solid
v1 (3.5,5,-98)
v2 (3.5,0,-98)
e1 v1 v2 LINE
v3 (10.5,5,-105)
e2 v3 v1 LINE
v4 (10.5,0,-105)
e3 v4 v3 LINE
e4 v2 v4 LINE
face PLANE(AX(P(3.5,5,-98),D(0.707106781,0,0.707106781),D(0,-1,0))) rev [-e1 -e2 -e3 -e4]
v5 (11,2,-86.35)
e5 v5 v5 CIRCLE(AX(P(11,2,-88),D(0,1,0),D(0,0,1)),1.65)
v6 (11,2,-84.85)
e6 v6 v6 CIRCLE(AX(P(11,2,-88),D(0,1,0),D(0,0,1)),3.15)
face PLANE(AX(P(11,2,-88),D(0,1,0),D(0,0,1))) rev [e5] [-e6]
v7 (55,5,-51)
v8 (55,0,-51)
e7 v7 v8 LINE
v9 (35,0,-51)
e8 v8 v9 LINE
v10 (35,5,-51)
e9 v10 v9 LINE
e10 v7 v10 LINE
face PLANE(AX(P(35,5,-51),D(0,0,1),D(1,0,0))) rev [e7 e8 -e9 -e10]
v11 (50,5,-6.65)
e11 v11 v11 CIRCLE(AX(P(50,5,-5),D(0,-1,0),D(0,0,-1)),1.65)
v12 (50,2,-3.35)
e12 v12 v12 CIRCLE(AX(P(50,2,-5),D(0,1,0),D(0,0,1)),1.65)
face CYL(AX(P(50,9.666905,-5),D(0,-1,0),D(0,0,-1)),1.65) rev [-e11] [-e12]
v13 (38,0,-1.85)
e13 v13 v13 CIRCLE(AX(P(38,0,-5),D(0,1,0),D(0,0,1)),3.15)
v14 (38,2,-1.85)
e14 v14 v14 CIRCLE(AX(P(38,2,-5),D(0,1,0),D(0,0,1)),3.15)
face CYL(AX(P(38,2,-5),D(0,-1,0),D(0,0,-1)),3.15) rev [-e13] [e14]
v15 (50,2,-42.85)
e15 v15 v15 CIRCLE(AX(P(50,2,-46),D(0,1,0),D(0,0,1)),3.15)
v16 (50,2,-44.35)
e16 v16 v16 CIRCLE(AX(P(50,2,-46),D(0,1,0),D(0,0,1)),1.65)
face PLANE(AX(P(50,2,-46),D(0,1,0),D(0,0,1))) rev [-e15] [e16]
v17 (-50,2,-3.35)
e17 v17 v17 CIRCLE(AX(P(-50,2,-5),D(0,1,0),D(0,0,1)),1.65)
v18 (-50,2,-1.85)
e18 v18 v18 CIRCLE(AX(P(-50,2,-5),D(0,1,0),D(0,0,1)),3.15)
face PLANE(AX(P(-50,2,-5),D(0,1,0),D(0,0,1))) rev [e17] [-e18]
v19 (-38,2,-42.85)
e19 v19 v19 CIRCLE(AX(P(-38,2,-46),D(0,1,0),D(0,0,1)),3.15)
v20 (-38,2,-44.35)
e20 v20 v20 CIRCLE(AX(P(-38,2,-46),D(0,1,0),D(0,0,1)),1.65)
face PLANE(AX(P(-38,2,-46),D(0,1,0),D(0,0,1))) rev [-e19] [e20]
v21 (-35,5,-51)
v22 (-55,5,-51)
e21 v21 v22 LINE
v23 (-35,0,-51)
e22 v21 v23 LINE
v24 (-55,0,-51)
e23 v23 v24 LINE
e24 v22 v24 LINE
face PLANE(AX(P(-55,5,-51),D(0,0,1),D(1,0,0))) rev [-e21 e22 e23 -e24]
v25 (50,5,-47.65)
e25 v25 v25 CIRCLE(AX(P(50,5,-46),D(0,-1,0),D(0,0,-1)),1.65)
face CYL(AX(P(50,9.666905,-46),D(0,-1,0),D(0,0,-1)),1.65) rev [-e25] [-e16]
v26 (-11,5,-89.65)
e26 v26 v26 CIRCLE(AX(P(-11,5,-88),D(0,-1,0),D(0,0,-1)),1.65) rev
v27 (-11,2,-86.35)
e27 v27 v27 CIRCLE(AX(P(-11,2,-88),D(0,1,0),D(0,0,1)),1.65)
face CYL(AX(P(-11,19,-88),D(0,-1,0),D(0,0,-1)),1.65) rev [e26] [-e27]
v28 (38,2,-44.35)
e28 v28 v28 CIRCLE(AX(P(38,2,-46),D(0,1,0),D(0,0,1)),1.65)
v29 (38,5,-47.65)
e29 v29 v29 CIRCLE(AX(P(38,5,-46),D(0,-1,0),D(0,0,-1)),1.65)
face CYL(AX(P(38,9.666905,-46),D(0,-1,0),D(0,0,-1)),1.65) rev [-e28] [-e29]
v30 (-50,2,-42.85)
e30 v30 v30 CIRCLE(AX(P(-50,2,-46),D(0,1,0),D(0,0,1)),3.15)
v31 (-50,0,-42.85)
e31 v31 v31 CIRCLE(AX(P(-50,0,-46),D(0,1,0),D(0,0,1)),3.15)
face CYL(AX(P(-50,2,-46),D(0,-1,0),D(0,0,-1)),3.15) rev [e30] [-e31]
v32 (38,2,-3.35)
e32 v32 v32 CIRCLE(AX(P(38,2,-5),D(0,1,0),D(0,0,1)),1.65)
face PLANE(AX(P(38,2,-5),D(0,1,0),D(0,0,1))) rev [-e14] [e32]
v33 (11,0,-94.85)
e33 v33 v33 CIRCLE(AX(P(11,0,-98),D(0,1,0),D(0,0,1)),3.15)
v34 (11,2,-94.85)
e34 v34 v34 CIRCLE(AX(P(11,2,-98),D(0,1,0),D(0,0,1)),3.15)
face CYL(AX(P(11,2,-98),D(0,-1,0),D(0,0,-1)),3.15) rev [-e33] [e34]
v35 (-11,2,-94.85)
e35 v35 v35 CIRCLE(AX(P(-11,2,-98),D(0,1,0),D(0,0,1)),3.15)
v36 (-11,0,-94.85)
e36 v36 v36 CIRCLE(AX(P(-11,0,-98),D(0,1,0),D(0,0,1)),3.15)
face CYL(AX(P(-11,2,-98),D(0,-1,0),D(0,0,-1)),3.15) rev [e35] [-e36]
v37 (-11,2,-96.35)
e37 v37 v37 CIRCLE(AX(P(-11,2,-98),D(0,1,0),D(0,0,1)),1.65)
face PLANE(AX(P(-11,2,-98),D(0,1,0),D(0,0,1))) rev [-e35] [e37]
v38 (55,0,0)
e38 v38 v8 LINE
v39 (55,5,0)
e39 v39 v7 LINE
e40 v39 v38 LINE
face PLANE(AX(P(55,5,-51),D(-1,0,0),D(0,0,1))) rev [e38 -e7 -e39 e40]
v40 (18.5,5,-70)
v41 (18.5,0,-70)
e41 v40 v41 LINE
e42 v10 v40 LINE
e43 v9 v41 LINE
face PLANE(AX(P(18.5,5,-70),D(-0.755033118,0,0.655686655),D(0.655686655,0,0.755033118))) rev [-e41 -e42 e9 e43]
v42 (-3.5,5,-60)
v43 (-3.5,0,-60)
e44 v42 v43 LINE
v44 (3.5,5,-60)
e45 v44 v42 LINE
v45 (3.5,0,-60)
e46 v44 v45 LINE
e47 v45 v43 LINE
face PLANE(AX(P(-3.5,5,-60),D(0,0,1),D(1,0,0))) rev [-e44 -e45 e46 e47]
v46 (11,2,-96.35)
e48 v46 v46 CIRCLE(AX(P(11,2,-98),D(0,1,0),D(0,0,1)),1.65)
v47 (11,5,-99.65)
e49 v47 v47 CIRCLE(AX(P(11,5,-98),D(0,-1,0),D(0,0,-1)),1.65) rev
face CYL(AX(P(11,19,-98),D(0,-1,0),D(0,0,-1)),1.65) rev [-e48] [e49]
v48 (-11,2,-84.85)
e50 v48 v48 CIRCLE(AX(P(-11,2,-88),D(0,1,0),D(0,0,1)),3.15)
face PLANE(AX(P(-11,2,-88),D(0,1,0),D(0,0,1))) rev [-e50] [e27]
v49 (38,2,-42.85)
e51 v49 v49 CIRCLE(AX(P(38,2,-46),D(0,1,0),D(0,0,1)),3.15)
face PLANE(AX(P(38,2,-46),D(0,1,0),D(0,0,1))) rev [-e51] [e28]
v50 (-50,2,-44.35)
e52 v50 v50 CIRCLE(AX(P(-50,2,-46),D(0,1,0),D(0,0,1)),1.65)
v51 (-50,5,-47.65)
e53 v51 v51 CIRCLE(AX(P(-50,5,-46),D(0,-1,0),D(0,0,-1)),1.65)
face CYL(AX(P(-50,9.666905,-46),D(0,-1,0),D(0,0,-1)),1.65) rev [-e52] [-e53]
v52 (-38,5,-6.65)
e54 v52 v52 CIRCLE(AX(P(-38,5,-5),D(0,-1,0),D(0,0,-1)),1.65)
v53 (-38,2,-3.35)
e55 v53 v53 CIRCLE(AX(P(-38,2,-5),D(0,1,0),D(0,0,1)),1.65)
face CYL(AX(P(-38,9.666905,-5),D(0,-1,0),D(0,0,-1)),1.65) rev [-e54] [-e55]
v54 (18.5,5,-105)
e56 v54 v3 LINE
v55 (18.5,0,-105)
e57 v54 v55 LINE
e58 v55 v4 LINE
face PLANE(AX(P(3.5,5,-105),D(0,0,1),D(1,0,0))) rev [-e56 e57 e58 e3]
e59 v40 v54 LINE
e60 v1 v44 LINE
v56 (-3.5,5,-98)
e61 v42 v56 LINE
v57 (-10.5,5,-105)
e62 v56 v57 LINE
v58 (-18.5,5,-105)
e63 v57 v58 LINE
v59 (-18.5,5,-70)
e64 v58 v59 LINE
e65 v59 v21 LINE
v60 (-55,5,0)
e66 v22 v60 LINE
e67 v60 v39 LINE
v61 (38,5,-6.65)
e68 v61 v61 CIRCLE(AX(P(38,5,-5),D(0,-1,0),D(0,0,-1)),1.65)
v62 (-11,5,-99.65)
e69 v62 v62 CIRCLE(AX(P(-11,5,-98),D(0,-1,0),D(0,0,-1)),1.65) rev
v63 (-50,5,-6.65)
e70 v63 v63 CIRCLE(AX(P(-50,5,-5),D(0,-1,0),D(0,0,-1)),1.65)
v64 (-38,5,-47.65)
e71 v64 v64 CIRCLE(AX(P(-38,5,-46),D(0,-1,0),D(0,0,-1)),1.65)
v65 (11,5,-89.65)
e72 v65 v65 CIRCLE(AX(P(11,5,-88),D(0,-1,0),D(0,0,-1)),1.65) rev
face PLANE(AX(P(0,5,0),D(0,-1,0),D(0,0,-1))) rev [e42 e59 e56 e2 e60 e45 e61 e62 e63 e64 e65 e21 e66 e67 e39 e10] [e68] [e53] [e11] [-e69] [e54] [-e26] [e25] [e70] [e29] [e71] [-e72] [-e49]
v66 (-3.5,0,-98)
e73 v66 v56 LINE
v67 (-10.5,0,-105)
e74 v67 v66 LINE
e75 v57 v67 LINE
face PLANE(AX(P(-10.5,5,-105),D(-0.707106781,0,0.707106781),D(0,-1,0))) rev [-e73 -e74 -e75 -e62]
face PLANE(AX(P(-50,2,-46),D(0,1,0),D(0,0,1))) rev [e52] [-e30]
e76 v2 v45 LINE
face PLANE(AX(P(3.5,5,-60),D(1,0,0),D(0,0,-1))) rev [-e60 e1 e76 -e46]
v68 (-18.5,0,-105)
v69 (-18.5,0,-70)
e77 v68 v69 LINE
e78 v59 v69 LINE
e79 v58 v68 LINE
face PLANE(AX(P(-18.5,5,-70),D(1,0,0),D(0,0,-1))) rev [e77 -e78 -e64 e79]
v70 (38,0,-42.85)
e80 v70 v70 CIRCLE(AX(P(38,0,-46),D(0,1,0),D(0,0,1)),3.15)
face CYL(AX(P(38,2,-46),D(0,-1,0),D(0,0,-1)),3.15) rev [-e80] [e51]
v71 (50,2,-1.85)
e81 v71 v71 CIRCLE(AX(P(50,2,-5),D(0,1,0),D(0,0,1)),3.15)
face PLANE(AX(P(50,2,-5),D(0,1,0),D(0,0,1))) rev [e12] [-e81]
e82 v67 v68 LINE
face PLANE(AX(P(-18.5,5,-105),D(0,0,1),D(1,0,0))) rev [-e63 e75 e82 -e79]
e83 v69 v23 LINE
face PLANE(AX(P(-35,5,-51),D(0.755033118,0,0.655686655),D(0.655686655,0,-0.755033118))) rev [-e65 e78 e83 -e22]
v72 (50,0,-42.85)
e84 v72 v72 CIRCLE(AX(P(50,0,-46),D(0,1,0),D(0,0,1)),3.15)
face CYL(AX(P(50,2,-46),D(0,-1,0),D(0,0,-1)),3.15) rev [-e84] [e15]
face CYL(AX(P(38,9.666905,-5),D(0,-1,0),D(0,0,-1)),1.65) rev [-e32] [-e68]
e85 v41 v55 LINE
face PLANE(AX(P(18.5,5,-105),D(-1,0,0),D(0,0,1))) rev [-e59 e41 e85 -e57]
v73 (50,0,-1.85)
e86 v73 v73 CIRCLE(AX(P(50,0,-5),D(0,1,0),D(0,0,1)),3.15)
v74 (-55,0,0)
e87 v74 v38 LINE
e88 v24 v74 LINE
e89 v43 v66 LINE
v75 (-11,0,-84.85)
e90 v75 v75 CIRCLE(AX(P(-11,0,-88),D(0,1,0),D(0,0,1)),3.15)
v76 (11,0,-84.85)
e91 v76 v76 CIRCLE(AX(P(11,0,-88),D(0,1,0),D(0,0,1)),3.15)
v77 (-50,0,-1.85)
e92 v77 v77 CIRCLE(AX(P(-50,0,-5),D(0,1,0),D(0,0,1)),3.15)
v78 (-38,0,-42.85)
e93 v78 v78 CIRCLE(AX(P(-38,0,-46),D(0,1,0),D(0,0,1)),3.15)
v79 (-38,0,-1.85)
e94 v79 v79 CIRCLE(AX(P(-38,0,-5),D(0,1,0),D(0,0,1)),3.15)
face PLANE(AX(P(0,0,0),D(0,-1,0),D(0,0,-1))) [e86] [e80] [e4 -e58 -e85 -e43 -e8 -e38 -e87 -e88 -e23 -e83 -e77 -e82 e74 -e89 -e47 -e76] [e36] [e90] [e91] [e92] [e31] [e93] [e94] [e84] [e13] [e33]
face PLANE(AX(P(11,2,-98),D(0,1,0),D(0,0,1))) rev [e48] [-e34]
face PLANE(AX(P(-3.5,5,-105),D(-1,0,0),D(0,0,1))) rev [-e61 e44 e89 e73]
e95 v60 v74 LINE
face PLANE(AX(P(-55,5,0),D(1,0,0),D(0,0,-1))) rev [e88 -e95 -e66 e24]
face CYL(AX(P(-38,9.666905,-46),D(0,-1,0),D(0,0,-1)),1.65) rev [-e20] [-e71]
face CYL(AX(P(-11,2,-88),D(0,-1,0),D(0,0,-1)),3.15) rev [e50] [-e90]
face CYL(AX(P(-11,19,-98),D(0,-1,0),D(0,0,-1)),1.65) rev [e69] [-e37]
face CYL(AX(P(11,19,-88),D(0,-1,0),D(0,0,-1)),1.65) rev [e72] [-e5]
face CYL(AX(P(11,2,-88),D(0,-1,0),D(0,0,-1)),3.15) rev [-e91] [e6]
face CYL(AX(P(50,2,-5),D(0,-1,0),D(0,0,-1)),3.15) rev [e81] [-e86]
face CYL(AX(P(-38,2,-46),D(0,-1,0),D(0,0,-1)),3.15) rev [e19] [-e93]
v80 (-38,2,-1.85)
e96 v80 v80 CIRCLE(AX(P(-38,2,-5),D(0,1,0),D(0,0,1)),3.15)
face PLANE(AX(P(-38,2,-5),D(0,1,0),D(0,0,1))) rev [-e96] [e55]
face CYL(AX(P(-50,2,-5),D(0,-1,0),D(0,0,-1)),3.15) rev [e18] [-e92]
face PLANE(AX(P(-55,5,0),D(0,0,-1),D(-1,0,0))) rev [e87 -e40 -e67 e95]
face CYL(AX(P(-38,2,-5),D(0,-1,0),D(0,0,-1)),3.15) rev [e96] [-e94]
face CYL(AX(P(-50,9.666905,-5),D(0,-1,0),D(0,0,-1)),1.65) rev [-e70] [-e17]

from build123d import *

# Parameters (mm, degrees)
BOSS_EXTRUDE1_DEPTH = 5
SKETCH2_R           = 1.65
CUT_EXTRUDE1_DEPTH  = 5
SKETCH3_R           = 1.65
CUT_EXTRUDE2_DEPTH  = 19
CHAMFER1_SIZE       = 7
SKETCH4_R           = 3.15
CUT_EXTRUDE4_DEPTH  = 2


# Read off the part's stored shape, not the designer's step: Boss-Extrude1
with BuildPart() as part:
    # Boss-Extrude1 outline → Boss-Extrude1 (new body)
    with BuildSketch(Plane(origin=(0, 0, 0), x_dir=(1, 0, 0), z_dir=(0, 1, 0))):
        Polygon((18.5, 105), (3.5, 105), (3.5, 60), (-3.5, 60), (-3.5, 105), (-18.5, 105), (-18.5, 70), (-35, 51), (-55, 51), (-55, 0), (55, 0), (55, 51), (35, 51), (18.5, 70), align=None)
    extrude(amount=BOSS_EXTRUDE1_DEPTH)

    # Sketch2 → Cut-Extrude1 (cut)
    with BuildSketch(Plane(origin=(0, 0, 0), x_dir=(1, 0, 0), z_dir=(0, 1, 0))):
        with Locations(Location((-50, 5, 0), (0, 0, 90))):
            Circle(SKETCH2_R)
        with Locations(Location((-38, 5, 0), (0, 0, 90))):
            Circle(SKETCH2_R)
        with Locations(Location((50, 5, 0), (0, 0, 90))):
            Circle(SKETCH2_R)
        with Locations(Location((38, 5, 0), (0, 0, 90))):
            Circle(SKETCH2_R)
        with Locations(Location((-50, 46, 0), (0, 0, 90))):
            Circle(SKETCH2_R)
        with Locations(Location((-38, 46, 0), (0, 0, 90))):
            Circle(SKETCH2_R)
        with Locations(Location((50, 46, 0), (0, 0, 90))):
            Circle(SKETCH2_R)
        with Locations(Location((38, 46, 0), (0, 0, 90))):
            Circle(SKETCH2_R)
    extrude(amount=CUT_EXTRUDE1_DEPTH, mode=Mode.SUBTRACT)

    # Sketch3 → Cut-Extrude2 (cut)
    with BuildSketch(Plane(origin=(0, 0, 0), x_dir=(1, 0, 0), z_dir=(0, 1, 0))):
        with Locations(Location((-11, 88, 0), (0, 0, 90))):
            Circle(SKETCH3_R)
        with Locations(Location((11, 88, 0), (0, 0, 90))):
            Circle(SKETCH3_R)
        with Locations(Location((11, 98, 0), (0, 0, 90))):
            Circle(SKETCH3_R)
        with Locations(Location((-11, 98, 0), (0, 0, 90))):
            Circle(SKETCH3_R)
    extrude(amount=CUT_EXTRUDE2_DEPTH, mode=Mode.SUBTRACT)

    # Chamfer1
    chamfer1_edges = [part.edges().sort_by_distance(p)[0] for p in [
        (-3.5, 2.5, -105),
        (3.5, 2.5, -105),
    ]]
    chamfer(chamfer1_edges, length=CHAMFER1_SIZE)

    # Sketch4 → Cut-Extrude4 (cut)
    with BuildSketch(Plane(origin=(0, 0, 0), x_dir=(1, 0, 0), z_dir=(0, 1, 0))):
        with Locations(Location((-11, 98, 0), (0, 0, 270))):
            Circle(SKETCH4_R)
        with Locations(Location((11, 98, 0), (0, 0, 270))):
            Circle(SKETCH4_R)
        with Locations(Location((-11, 88, 0), (0, 0, 270))):
            Circle(SKETCH4_R)
        with Locations(Location((11, 88, 0), (0, 0, 270))):
            Circle(SKETCH4_R)
        with Locations(Location((-50, 46, 0), (0, 0, 270))):
            Circle(SKETCH4_R)
        with Locations(Location((-38, 46, 0), (0, 0, 270))):
            Circle(SKETCH4_R)
        with Locations(Location((38, 46, 0), (0, 0, 270))):
            Circle(SKETCH4_R)
        with Locations(Location((50, 46, 0), (0, 0, 270))):
            Circle(SKETCH4_R)
        with Locations(Location((38, 5, 0), (0, 0, 270))):
            Circle(SKETCH4_R)
        with Locations(Location((50, 5, 0), (0, 0, 270))):
            Circle(SKETCH4_R)
        with Locations(Location((-50, 5, 0), (0, 0, 270))):
            Circle(SKETCH4_R)
        with Locations(Location((-38, 5, 0), (0, 0, 270))):
            Circle(SKETCH4_R)
    extrude(amount=CUT_EXTRUDE4_DEPTH, mode=Mode.SUBTRACT)


solid = part.part
